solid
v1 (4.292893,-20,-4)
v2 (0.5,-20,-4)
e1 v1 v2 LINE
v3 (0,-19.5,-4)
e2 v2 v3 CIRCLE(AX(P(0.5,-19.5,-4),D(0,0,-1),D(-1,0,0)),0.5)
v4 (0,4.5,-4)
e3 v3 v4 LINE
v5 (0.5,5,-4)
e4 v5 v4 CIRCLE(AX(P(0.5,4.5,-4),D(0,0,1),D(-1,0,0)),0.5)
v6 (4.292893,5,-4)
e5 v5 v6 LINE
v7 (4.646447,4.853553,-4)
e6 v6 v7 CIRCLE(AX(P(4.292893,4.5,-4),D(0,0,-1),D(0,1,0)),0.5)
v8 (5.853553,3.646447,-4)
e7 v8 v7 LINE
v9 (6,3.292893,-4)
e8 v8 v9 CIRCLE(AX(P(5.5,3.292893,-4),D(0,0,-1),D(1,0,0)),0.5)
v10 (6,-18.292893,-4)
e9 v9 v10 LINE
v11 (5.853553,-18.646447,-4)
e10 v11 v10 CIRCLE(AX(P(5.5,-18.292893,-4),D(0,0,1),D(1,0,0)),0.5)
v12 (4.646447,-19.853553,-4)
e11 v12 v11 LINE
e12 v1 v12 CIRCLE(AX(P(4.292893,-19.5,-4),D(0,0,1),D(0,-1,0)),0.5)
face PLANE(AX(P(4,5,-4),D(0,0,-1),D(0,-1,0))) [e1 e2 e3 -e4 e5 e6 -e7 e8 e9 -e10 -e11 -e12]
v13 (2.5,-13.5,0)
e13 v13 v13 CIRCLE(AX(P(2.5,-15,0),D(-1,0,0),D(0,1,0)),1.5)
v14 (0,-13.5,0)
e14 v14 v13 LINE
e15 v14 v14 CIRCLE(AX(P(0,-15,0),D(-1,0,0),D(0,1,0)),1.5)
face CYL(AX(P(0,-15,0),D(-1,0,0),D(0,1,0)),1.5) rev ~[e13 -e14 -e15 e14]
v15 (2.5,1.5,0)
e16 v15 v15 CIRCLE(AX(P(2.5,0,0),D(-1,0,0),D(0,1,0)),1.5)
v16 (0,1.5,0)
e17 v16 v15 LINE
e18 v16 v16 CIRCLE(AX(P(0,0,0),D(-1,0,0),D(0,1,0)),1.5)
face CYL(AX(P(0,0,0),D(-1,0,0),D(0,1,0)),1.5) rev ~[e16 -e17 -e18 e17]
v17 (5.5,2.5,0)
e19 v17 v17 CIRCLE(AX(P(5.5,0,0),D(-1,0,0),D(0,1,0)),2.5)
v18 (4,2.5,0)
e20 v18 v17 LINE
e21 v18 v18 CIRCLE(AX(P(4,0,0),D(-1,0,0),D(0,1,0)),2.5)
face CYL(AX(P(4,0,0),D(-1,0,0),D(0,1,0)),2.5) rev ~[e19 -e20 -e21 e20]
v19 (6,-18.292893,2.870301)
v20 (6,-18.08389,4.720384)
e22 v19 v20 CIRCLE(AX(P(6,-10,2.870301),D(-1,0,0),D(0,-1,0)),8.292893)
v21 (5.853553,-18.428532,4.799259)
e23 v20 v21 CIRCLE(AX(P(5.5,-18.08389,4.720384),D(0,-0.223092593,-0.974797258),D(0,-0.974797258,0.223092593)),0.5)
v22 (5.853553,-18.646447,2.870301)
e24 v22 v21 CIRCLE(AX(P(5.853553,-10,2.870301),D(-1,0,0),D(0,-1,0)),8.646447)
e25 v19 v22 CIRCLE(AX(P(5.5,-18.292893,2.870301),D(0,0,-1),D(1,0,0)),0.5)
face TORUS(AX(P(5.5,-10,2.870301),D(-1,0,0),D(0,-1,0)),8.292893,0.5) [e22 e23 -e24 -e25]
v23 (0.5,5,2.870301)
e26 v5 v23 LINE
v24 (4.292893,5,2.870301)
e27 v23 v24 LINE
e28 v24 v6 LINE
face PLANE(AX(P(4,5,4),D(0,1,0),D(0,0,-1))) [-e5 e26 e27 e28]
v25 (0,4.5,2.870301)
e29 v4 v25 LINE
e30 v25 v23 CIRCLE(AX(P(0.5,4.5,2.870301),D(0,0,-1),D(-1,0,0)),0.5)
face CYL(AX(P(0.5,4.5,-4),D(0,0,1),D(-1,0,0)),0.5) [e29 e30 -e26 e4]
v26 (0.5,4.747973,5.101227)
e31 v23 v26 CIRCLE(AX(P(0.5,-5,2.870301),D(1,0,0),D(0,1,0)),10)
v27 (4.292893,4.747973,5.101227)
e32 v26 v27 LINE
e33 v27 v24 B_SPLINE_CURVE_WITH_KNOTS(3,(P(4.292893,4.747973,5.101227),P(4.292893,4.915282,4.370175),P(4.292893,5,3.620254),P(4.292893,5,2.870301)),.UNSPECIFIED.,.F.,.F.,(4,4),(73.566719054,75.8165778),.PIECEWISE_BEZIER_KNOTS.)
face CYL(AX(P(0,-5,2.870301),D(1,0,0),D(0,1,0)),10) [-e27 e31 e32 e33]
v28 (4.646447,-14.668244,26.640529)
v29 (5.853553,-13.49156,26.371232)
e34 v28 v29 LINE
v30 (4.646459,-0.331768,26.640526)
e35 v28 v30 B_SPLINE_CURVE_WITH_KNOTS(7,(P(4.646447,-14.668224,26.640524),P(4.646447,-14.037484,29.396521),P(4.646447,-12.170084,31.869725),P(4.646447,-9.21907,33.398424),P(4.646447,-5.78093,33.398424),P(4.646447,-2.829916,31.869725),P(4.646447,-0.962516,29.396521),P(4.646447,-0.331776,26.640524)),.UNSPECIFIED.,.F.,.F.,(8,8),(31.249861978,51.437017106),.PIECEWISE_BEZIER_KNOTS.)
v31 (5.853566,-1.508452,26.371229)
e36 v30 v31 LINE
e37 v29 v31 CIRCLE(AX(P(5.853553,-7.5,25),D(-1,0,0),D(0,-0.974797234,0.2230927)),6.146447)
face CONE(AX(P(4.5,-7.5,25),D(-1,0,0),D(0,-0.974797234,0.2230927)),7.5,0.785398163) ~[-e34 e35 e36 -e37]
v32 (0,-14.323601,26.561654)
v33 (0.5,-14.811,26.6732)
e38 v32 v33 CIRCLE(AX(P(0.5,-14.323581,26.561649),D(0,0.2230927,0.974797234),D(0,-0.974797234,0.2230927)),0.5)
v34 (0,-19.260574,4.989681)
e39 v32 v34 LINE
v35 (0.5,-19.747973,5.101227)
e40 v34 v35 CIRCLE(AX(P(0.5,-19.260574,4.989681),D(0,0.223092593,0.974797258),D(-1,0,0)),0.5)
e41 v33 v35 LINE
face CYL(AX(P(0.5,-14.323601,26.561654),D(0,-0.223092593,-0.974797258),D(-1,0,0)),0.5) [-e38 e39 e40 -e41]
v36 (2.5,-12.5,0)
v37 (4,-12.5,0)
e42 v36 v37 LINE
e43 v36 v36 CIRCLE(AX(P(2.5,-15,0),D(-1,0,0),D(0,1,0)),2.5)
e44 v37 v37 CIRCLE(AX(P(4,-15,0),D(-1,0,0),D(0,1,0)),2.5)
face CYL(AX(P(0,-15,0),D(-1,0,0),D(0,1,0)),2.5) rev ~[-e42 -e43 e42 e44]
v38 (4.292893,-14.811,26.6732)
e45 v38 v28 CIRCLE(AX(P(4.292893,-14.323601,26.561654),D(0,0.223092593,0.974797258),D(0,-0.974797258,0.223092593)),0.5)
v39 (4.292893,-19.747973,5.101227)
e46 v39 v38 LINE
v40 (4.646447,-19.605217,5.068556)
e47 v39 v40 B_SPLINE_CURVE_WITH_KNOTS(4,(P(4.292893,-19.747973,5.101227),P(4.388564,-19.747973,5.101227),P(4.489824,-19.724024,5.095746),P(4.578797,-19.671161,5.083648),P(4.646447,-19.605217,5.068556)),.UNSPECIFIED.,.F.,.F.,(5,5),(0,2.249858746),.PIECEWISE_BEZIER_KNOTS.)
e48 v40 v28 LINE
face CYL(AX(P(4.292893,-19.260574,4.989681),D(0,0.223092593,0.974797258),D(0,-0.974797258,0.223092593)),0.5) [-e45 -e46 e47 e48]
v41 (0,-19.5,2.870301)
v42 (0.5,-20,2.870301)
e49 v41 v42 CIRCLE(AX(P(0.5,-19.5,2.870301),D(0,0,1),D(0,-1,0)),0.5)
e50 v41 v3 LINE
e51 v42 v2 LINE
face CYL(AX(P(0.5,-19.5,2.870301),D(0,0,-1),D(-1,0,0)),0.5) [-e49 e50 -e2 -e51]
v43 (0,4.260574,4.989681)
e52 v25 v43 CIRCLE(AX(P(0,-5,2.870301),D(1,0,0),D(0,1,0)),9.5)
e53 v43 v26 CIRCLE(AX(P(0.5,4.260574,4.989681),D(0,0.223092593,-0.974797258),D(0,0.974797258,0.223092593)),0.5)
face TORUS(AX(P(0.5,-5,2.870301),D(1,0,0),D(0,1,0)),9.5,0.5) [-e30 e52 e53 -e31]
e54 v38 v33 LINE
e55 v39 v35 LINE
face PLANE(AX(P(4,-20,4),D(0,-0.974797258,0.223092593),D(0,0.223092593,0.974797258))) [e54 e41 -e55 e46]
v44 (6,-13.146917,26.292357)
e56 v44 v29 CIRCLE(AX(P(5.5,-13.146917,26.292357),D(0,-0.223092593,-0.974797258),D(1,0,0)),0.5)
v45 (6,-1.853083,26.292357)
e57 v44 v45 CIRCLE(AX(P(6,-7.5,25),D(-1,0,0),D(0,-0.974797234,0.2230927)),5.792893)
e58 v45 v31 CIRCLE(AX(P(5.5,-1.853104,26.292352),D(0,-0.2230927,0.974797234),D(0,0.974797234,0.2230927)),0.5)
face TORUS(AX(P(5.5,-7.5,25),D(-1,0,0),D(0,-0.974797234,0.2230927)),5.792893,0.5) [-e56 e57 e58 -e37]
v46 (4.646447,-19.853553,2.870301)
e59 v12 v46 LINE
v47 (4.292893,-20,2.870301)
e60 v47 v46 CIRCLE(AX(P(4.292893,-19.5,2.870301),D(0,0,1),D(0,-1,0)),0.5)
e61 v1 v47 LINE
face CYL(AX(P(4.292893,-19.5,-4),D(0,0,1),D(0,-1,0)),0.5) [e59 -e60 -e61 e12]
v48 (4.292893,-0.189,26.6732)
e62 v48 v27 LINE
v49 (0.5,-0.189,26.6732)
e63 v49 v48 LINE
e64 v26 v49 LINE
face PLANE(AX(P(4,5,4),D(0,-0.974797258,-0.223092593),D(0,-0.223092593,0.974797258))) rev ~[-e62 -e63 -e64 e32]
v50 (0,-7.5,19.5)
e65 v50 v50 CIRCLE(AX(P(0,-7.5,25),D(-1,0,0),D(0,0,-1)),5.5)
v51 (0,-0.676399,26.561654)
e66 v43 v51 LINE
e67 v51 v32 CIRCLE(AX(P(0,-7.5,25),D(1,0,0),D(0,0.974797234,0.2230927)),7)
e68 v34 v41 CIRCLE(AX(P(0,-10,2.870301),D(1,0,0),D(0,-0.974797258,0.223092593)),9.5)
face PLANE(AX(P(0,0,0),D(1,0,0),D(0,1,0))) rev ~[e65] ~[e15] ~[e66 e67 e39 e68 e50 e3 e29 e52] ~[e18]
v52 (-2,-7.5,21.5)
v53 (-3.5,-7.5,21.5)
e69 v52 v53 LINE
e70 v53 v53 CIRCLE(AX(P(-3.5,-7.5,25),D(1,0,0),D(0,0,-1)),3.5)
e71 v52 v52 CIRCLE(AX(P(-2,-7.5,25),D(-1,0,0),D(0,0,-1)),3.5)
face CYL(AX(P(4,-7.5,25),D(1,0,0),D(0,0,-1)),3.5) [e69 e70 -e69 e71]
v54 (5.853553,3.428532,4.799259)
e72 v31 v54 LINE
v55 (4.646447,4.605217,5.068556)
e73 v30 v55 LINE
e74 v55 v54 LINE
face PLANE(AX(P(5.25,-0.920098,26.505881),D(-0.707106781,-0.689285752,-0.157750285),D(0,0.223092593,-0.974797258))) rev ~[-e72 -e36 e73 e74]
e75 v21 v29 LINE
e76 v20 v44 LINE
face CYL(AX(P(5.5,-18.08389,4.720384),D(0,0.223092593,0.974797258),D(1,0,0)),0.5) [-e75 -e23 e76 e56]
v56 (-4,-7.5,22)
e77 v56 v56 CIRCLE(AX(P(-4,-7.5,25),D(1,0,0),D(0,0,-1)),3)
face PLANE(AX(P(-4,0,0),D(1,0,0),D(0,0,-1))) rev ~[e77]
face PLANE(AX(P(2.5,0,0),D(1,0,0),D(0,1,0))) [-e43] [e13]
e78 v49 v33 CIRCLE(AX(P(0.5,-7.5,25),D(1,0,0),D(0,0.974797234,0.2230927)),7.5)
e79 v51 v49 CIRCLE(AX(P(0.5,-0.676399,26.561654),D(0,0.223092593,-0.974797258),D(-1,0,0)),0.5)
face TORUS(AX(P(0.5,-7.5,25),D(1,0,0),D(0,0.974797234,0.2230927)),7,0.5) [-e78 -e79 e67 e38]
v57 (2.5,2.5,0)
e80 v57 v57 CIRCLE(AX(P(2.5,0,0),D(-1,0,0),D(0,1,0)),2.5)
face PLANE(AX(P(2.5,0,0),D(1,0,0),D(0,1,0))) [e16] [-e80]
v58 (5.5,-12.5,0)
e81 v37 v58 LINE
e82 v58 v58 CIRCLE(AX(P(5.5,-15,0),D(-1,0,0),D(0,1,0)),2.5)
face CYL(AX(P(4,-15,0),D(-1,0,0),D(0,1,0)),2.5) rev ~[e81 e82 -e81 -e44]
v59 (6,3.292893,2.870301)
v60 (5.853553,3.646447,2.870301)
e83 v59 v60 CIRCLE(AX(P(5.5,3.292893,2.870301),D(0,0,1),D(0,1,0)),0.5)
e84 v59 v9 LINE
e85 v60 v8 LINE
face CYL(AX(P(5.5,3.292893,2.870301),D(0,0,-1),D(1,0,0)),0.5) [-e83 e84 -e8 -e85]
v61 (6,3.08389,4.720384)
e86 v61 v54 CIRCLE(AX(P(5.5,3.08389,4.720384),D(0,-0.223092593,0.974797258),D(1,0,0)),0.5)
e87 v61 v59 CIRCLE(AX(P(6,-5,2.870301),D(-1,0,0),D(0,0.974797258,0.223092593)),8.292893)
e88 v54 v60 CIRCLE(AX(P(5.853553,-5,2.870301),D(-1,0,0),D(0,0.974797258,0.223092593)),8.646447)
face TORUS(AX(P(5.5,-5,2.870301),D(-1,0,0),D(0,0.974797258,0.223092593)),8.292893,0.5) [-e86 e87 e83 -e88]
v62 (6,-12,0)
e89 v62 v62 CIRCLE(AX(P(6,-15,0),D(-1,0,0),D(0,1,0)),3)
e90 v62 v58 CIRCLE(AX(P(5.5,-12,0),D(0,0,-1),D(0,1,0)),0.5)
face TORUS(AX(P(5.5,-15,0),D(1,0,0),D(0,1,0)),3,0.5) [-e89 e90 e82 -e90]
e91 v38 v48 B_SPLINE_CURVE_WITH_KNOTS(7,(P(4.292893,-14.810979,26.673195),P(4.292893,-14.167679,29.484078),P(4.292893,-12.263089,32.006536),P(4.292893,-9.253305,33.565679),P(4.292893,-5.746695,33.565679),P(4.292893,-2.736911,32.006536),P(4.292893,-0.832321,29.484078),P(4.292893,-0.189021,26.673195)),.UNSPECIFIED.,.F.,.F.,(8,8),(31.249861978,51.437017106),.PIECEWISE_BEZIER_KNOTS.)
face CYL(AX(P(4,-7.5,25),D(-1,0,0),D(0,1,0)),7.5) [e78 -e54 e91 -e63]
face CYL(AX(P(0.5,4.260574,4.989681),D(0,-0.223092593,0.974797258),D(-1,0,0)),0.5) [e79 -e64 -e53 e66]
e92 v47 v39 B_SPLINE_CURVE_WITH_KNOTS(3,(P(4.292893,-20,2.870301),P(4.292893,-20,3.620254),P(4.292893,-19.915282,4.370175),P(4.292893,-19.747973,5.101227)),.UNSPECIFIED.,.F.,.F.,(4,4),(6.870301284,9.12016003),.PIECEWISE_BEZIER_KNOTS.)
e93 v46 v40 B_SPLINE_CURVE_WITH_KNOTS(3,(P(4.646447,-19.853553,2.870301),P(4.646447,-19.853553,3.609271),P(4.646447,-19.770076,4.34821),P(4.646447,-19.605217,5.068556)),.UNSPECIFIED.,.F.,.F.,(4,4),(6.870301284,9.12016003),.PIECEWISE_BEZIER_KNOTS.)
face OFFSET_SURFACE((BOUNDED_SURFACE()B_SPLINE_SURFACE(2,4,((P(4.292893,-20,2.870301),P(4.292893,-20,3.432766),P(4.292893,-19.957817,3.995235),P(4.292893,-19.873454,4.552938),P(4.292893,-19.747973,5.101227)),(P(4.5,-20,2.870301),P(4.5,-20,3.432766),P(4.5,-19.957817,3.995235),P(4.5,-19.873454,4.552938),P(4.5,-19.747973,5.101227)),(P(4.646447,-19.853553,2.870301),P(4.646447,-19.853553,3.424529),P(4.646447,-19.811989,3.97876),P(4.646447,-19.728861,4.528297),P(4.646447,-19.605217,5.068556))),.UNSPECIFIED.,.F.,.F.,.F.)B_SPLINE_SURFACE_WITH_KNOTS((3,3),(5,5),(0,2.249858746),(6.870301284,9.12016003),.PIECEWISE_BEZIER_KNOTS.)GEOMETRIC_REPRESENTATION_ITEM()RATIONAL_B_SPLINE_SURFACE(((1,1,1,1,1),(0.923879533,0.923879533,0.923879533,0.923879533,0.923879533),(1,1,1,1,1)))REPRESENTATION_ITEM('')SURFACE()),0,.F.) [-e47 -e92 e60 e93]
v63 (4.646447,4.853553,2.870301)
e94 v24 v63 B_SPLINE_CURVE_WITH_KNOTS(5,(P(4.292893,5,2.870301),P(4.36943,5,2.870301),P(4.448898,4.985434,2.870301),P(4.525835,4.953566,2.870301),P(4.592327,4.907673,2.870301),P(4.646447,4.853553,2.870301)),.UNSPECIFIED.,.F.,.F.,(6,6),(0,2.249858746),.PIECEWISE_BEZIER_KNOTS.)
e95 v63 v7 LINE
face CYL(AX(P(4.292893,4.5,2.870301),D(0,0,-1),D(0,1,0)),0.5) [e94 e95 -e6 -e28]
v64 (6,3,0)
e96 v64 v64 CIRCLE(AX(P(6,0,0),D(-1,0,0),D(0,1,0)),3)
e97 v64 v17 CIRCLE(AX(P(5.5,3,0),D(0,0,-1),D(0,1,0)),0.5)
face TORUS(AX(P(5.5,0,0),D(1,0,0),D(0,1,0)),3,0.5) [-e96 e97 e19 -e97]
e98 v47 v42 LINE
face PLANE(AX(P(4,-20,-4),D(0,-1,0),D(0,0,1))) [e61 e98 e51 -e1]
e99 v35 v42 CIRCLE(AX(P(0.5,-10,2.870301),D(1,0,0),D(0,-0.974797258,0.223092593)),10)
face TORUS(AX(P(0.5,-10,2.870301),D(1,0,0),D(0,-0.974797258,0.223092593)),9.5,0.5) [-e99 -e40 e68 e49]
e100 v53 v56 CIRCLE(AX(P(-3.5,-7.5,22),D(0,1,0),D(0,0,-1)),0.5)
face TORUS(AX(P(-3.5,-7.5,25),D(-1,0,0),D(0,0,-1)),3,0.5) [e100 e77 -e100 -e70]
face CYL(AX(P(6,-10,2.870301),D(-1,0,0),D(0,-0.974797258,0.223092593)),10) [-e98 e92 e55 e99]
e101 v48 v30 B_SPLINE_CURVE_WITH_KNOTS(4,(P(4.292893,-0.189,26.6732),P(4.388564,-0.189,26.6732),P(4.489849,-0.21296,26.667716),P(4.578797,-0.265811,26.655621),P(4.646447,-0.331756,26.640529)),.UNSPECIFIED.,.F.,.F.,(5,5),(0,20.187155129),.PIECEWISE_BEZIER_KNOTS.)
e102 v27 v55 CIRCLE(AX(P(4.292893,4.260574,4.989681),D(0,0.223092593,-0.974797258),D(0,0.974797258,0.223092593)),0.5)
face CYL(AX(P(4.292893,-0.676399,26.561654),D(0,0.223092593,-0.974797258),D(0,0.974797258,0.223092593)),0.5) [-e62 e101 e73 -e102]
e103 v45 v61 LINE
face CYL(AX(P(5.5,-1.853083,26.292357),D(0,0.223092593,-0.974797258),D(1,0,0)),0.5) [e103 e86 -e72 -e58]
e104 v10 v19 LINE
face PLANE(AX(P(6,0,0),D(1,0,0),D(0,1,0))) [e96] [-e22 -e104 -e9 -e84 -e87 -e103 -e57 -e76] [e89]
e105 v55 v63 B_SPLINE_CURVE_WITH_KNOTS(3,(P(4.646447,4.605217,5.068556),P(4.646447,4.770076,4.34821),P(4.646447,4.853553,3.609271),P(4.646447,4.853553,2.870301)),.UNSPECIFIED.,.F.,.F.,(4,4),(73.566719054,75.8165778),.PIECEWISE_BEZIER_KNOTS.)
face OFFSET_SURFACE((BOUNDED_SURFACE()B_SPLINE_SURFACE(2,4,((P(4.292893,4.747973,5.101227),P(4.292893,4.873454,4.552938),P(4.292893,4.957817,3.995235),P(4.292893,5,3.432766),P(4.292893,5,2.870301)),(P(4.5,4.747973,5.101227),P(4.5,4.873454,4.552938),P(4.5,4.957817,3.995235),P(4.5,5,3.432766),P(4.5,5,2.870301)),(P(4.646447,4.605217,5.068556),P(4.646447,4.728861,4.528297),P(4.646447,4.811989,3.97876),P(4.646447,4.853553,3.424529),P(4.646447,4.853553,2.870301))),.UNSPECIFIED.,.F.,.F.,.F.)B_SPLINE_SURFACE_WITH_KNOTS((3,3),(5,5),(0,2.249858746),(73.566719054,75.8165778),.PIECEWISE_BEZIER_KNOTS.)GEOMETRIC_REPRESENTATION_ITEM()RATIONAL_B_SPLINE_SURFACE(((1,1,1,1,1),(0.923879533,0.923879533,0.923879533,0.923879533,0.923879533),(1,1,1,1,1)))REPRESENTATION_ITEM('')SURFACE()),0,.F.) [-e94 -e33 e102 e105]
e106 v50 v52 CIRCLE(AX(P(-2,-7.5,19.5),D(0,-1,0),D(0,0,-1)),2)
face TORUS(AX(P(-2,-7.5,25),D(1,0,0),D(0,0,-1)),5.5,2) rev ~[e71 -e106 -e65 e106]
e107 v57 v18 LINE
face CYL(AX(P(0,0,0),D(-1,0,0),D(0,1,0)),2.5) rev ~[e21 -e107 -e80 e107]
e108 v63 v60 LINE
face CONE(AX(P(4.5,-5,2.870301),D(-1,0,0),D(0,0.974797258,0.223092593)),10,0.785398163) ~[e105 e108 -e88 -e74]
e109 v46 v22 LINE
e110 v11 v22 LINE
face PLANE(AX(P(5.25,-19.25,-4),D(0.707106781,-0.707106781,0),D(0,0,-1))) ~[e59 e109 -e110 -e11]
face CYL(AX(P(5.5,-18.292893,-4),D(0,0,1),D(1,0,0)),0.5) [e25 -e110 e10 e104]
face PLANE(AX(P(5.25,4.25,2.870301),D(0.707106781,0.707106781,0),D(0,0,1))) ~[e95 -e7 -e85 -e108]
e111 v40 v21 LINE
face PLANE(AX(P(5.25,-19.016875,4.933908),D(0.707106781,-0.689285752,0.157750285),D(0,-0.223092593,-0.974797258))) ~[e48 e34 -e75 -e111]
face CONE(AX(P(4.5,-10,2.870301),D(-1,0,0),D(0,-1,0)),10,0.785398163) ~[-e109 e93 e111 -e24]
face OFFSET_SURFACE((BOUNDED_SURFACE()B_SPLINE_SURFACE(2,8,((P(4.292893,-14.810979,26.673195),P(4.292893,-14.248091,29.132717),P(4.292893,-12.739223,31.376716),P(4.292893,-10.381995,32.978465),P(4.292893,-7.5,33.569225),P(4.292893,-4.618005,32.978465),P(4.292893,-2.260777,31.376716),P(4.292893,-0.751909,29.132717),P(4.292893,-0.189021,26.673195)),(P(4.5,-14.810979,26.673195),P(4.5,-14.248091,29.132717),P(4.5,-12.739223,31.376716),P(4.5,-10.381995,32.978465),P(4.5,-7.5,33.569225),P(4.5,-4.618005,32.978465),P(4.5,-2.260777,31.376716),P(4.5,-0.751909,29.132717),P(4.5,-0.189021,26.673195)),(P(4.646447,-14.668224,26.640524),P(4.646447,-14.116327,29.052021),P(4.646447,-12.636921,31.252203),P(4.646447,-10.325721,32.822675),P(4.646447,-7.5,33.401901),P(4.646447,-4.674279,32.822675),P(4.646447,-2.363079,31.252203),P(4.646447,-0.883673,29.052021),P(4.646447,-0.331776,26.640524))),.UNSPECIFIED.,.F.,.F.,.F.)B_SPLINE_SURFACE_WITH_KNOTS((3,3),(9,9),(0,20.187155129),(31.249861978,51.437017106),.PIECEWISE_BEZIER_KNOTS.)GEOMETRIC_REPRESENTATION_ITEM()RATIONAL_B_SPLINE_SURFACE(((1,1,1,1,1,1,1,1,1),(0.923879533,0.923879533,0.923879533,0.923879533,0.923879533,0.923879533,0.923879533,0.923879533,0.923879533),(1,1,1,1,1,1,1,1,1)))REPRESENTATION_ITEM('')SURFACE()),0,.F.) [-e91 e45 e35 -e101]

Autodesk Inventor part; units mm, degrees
ref_plane "YZ Plane" through (0, 0, 0) normal (1, 0, 0) x (0, 1, 0)
ref_plane "XZ Plane" through (0, 0, 0) normal (0, 1, 0) x (-1, 0, 0)
ref_plane "XY Plane" through (0, 0, 0) normal (0, 0, 1) x (1, 0, 0)
sketch "스케치1" plane through (0, 0, 0) normal (1, 0, 0) x (0, 1, 0)
  circle A0 centre (0, 0) radius 1.5
  circle A1 centre (0, 0) radius 2.5
  line L0 (0, 0) -> (0, -4)
  line L1 (0, -4) -> (5, -4)
  line L2 (5, -4) -> (-20, -4)
  line L3 (-20, -4) -> (-20, 4)
  line L4 (-20, 4) -> (5, 4)
  line L5 (5, 4) -> (5, -4)
  circle A2 centre (-15, 0) radius 1.5
  circle A3 centre (-15, 0) radius 2.5
  line L6 (-15, 0) -> (-15, 25)
  line L7 (-15, 25) -> (-7.5, 25)
  circle A4 centre (-7.5, 25) radius 3.5
  circle A5 centre (-7.5, 25) radius 7.5
  line L8 (5, 4) -> (-0.189, 26.6732)
  line L9 (-20, 4) -> (-14.811, 26.6732)
  point P0 (-14.811, 26.6732)
  dimension "d0" = 3
  dimension "d1" = 5
  dimension "d2" = 4
  dimension "d3" = 5
  dimension "d4" = 25
  dimension "d5" = 8
  dimension "d8" = 15
  dimension "d13" = 25
  dimension "d14" = 7.5
  dimension "d15" = 7
  dimension "d16" = 15
extrude "돌출1" add sketch "스케치1" along normal blind 4 contours L2 L3 L4 L5 L1 | L4 L6 A5 L8 | L9 A5 L6 L4 | A5
extrude "돌출2" add sketch "스케치1" along normal blind 2 contours A1 | A3
sketch "스케치2" plane through (4, 0, 0) normal (1, 0, 0) x (0, 0, -1)
  circle A0 centre (-25, -7.5) radius 3.5 projected
  circle A1 centre (-25, -7.5) radius 3.5
  point P0 (0, 0)
extrude "돌출3" add sketch "스케치2" against normal blind 8
move faces "이동2" translate (2, 0, 0) faces at (4, -5.2955, 18.5613)
fillet "모깎기1" radius 2 1 edges at (0, -7.5, 28.5)
fillet "모깎기2" radius 10 2 edges at (3, 5, 4) (3, -20, 4)
chamfer "모따기1" distance 1.5 angle 45 7 edges at (6, -17.2795, 15.8872) (6, -19.9368, 3.9929) (6, -20, -0.5649) (6, -7.5, 32.5) (6, 2.2795, 15.8872) (6, 4.9368, 3.9929) (6, 5, -0.5649)
fillet "모깎기3" radius 0.5 14 edges at (6, -7.5, 31) (6, 0.8173, 15.5526) (6, 3.4463, 3.8245) (6, 3.5, -0.5649) (6, -18.4463, 3.8245) (6, -18.5, -0.5649) (6, -15.8173, 15.5526) (4.5, -19.9368, 3.9929) (4.5, -20, -0.5649) (4.5, -7.5, 32.5) (4.5, 2.2795, 15.8872) (4.5, 4.9368, 3.9929) (4.5, 5, -0.5649) (4.5, -17.2795, 15.8872)
fillet "모깎기4" radius 0.5 7 edges at (0, -19.9368, 3.9929) (0, -17.2795, 15.8872) (0, -7.5, 32.5) (0, 2.2795, 15.8872) (0, 4.9368, 3.9929) (0, 5, -0.5649) (0, -20, -0.5649)
fillet "모깎기5" radius 0.5 1 edges at (-4, -7.5, 28.5)
move faces "이동1" translate (0.5, 0, 0) faces at (2, -12.8575, 0.1994) (2, 2.1279, 0.3191)
fillet "모깎기6" radius 0.5 2 edges at (6, -2.5, 0) (6, -17.5, 0)
properties part number "롤축지지대베어링_3D 인쇄"
